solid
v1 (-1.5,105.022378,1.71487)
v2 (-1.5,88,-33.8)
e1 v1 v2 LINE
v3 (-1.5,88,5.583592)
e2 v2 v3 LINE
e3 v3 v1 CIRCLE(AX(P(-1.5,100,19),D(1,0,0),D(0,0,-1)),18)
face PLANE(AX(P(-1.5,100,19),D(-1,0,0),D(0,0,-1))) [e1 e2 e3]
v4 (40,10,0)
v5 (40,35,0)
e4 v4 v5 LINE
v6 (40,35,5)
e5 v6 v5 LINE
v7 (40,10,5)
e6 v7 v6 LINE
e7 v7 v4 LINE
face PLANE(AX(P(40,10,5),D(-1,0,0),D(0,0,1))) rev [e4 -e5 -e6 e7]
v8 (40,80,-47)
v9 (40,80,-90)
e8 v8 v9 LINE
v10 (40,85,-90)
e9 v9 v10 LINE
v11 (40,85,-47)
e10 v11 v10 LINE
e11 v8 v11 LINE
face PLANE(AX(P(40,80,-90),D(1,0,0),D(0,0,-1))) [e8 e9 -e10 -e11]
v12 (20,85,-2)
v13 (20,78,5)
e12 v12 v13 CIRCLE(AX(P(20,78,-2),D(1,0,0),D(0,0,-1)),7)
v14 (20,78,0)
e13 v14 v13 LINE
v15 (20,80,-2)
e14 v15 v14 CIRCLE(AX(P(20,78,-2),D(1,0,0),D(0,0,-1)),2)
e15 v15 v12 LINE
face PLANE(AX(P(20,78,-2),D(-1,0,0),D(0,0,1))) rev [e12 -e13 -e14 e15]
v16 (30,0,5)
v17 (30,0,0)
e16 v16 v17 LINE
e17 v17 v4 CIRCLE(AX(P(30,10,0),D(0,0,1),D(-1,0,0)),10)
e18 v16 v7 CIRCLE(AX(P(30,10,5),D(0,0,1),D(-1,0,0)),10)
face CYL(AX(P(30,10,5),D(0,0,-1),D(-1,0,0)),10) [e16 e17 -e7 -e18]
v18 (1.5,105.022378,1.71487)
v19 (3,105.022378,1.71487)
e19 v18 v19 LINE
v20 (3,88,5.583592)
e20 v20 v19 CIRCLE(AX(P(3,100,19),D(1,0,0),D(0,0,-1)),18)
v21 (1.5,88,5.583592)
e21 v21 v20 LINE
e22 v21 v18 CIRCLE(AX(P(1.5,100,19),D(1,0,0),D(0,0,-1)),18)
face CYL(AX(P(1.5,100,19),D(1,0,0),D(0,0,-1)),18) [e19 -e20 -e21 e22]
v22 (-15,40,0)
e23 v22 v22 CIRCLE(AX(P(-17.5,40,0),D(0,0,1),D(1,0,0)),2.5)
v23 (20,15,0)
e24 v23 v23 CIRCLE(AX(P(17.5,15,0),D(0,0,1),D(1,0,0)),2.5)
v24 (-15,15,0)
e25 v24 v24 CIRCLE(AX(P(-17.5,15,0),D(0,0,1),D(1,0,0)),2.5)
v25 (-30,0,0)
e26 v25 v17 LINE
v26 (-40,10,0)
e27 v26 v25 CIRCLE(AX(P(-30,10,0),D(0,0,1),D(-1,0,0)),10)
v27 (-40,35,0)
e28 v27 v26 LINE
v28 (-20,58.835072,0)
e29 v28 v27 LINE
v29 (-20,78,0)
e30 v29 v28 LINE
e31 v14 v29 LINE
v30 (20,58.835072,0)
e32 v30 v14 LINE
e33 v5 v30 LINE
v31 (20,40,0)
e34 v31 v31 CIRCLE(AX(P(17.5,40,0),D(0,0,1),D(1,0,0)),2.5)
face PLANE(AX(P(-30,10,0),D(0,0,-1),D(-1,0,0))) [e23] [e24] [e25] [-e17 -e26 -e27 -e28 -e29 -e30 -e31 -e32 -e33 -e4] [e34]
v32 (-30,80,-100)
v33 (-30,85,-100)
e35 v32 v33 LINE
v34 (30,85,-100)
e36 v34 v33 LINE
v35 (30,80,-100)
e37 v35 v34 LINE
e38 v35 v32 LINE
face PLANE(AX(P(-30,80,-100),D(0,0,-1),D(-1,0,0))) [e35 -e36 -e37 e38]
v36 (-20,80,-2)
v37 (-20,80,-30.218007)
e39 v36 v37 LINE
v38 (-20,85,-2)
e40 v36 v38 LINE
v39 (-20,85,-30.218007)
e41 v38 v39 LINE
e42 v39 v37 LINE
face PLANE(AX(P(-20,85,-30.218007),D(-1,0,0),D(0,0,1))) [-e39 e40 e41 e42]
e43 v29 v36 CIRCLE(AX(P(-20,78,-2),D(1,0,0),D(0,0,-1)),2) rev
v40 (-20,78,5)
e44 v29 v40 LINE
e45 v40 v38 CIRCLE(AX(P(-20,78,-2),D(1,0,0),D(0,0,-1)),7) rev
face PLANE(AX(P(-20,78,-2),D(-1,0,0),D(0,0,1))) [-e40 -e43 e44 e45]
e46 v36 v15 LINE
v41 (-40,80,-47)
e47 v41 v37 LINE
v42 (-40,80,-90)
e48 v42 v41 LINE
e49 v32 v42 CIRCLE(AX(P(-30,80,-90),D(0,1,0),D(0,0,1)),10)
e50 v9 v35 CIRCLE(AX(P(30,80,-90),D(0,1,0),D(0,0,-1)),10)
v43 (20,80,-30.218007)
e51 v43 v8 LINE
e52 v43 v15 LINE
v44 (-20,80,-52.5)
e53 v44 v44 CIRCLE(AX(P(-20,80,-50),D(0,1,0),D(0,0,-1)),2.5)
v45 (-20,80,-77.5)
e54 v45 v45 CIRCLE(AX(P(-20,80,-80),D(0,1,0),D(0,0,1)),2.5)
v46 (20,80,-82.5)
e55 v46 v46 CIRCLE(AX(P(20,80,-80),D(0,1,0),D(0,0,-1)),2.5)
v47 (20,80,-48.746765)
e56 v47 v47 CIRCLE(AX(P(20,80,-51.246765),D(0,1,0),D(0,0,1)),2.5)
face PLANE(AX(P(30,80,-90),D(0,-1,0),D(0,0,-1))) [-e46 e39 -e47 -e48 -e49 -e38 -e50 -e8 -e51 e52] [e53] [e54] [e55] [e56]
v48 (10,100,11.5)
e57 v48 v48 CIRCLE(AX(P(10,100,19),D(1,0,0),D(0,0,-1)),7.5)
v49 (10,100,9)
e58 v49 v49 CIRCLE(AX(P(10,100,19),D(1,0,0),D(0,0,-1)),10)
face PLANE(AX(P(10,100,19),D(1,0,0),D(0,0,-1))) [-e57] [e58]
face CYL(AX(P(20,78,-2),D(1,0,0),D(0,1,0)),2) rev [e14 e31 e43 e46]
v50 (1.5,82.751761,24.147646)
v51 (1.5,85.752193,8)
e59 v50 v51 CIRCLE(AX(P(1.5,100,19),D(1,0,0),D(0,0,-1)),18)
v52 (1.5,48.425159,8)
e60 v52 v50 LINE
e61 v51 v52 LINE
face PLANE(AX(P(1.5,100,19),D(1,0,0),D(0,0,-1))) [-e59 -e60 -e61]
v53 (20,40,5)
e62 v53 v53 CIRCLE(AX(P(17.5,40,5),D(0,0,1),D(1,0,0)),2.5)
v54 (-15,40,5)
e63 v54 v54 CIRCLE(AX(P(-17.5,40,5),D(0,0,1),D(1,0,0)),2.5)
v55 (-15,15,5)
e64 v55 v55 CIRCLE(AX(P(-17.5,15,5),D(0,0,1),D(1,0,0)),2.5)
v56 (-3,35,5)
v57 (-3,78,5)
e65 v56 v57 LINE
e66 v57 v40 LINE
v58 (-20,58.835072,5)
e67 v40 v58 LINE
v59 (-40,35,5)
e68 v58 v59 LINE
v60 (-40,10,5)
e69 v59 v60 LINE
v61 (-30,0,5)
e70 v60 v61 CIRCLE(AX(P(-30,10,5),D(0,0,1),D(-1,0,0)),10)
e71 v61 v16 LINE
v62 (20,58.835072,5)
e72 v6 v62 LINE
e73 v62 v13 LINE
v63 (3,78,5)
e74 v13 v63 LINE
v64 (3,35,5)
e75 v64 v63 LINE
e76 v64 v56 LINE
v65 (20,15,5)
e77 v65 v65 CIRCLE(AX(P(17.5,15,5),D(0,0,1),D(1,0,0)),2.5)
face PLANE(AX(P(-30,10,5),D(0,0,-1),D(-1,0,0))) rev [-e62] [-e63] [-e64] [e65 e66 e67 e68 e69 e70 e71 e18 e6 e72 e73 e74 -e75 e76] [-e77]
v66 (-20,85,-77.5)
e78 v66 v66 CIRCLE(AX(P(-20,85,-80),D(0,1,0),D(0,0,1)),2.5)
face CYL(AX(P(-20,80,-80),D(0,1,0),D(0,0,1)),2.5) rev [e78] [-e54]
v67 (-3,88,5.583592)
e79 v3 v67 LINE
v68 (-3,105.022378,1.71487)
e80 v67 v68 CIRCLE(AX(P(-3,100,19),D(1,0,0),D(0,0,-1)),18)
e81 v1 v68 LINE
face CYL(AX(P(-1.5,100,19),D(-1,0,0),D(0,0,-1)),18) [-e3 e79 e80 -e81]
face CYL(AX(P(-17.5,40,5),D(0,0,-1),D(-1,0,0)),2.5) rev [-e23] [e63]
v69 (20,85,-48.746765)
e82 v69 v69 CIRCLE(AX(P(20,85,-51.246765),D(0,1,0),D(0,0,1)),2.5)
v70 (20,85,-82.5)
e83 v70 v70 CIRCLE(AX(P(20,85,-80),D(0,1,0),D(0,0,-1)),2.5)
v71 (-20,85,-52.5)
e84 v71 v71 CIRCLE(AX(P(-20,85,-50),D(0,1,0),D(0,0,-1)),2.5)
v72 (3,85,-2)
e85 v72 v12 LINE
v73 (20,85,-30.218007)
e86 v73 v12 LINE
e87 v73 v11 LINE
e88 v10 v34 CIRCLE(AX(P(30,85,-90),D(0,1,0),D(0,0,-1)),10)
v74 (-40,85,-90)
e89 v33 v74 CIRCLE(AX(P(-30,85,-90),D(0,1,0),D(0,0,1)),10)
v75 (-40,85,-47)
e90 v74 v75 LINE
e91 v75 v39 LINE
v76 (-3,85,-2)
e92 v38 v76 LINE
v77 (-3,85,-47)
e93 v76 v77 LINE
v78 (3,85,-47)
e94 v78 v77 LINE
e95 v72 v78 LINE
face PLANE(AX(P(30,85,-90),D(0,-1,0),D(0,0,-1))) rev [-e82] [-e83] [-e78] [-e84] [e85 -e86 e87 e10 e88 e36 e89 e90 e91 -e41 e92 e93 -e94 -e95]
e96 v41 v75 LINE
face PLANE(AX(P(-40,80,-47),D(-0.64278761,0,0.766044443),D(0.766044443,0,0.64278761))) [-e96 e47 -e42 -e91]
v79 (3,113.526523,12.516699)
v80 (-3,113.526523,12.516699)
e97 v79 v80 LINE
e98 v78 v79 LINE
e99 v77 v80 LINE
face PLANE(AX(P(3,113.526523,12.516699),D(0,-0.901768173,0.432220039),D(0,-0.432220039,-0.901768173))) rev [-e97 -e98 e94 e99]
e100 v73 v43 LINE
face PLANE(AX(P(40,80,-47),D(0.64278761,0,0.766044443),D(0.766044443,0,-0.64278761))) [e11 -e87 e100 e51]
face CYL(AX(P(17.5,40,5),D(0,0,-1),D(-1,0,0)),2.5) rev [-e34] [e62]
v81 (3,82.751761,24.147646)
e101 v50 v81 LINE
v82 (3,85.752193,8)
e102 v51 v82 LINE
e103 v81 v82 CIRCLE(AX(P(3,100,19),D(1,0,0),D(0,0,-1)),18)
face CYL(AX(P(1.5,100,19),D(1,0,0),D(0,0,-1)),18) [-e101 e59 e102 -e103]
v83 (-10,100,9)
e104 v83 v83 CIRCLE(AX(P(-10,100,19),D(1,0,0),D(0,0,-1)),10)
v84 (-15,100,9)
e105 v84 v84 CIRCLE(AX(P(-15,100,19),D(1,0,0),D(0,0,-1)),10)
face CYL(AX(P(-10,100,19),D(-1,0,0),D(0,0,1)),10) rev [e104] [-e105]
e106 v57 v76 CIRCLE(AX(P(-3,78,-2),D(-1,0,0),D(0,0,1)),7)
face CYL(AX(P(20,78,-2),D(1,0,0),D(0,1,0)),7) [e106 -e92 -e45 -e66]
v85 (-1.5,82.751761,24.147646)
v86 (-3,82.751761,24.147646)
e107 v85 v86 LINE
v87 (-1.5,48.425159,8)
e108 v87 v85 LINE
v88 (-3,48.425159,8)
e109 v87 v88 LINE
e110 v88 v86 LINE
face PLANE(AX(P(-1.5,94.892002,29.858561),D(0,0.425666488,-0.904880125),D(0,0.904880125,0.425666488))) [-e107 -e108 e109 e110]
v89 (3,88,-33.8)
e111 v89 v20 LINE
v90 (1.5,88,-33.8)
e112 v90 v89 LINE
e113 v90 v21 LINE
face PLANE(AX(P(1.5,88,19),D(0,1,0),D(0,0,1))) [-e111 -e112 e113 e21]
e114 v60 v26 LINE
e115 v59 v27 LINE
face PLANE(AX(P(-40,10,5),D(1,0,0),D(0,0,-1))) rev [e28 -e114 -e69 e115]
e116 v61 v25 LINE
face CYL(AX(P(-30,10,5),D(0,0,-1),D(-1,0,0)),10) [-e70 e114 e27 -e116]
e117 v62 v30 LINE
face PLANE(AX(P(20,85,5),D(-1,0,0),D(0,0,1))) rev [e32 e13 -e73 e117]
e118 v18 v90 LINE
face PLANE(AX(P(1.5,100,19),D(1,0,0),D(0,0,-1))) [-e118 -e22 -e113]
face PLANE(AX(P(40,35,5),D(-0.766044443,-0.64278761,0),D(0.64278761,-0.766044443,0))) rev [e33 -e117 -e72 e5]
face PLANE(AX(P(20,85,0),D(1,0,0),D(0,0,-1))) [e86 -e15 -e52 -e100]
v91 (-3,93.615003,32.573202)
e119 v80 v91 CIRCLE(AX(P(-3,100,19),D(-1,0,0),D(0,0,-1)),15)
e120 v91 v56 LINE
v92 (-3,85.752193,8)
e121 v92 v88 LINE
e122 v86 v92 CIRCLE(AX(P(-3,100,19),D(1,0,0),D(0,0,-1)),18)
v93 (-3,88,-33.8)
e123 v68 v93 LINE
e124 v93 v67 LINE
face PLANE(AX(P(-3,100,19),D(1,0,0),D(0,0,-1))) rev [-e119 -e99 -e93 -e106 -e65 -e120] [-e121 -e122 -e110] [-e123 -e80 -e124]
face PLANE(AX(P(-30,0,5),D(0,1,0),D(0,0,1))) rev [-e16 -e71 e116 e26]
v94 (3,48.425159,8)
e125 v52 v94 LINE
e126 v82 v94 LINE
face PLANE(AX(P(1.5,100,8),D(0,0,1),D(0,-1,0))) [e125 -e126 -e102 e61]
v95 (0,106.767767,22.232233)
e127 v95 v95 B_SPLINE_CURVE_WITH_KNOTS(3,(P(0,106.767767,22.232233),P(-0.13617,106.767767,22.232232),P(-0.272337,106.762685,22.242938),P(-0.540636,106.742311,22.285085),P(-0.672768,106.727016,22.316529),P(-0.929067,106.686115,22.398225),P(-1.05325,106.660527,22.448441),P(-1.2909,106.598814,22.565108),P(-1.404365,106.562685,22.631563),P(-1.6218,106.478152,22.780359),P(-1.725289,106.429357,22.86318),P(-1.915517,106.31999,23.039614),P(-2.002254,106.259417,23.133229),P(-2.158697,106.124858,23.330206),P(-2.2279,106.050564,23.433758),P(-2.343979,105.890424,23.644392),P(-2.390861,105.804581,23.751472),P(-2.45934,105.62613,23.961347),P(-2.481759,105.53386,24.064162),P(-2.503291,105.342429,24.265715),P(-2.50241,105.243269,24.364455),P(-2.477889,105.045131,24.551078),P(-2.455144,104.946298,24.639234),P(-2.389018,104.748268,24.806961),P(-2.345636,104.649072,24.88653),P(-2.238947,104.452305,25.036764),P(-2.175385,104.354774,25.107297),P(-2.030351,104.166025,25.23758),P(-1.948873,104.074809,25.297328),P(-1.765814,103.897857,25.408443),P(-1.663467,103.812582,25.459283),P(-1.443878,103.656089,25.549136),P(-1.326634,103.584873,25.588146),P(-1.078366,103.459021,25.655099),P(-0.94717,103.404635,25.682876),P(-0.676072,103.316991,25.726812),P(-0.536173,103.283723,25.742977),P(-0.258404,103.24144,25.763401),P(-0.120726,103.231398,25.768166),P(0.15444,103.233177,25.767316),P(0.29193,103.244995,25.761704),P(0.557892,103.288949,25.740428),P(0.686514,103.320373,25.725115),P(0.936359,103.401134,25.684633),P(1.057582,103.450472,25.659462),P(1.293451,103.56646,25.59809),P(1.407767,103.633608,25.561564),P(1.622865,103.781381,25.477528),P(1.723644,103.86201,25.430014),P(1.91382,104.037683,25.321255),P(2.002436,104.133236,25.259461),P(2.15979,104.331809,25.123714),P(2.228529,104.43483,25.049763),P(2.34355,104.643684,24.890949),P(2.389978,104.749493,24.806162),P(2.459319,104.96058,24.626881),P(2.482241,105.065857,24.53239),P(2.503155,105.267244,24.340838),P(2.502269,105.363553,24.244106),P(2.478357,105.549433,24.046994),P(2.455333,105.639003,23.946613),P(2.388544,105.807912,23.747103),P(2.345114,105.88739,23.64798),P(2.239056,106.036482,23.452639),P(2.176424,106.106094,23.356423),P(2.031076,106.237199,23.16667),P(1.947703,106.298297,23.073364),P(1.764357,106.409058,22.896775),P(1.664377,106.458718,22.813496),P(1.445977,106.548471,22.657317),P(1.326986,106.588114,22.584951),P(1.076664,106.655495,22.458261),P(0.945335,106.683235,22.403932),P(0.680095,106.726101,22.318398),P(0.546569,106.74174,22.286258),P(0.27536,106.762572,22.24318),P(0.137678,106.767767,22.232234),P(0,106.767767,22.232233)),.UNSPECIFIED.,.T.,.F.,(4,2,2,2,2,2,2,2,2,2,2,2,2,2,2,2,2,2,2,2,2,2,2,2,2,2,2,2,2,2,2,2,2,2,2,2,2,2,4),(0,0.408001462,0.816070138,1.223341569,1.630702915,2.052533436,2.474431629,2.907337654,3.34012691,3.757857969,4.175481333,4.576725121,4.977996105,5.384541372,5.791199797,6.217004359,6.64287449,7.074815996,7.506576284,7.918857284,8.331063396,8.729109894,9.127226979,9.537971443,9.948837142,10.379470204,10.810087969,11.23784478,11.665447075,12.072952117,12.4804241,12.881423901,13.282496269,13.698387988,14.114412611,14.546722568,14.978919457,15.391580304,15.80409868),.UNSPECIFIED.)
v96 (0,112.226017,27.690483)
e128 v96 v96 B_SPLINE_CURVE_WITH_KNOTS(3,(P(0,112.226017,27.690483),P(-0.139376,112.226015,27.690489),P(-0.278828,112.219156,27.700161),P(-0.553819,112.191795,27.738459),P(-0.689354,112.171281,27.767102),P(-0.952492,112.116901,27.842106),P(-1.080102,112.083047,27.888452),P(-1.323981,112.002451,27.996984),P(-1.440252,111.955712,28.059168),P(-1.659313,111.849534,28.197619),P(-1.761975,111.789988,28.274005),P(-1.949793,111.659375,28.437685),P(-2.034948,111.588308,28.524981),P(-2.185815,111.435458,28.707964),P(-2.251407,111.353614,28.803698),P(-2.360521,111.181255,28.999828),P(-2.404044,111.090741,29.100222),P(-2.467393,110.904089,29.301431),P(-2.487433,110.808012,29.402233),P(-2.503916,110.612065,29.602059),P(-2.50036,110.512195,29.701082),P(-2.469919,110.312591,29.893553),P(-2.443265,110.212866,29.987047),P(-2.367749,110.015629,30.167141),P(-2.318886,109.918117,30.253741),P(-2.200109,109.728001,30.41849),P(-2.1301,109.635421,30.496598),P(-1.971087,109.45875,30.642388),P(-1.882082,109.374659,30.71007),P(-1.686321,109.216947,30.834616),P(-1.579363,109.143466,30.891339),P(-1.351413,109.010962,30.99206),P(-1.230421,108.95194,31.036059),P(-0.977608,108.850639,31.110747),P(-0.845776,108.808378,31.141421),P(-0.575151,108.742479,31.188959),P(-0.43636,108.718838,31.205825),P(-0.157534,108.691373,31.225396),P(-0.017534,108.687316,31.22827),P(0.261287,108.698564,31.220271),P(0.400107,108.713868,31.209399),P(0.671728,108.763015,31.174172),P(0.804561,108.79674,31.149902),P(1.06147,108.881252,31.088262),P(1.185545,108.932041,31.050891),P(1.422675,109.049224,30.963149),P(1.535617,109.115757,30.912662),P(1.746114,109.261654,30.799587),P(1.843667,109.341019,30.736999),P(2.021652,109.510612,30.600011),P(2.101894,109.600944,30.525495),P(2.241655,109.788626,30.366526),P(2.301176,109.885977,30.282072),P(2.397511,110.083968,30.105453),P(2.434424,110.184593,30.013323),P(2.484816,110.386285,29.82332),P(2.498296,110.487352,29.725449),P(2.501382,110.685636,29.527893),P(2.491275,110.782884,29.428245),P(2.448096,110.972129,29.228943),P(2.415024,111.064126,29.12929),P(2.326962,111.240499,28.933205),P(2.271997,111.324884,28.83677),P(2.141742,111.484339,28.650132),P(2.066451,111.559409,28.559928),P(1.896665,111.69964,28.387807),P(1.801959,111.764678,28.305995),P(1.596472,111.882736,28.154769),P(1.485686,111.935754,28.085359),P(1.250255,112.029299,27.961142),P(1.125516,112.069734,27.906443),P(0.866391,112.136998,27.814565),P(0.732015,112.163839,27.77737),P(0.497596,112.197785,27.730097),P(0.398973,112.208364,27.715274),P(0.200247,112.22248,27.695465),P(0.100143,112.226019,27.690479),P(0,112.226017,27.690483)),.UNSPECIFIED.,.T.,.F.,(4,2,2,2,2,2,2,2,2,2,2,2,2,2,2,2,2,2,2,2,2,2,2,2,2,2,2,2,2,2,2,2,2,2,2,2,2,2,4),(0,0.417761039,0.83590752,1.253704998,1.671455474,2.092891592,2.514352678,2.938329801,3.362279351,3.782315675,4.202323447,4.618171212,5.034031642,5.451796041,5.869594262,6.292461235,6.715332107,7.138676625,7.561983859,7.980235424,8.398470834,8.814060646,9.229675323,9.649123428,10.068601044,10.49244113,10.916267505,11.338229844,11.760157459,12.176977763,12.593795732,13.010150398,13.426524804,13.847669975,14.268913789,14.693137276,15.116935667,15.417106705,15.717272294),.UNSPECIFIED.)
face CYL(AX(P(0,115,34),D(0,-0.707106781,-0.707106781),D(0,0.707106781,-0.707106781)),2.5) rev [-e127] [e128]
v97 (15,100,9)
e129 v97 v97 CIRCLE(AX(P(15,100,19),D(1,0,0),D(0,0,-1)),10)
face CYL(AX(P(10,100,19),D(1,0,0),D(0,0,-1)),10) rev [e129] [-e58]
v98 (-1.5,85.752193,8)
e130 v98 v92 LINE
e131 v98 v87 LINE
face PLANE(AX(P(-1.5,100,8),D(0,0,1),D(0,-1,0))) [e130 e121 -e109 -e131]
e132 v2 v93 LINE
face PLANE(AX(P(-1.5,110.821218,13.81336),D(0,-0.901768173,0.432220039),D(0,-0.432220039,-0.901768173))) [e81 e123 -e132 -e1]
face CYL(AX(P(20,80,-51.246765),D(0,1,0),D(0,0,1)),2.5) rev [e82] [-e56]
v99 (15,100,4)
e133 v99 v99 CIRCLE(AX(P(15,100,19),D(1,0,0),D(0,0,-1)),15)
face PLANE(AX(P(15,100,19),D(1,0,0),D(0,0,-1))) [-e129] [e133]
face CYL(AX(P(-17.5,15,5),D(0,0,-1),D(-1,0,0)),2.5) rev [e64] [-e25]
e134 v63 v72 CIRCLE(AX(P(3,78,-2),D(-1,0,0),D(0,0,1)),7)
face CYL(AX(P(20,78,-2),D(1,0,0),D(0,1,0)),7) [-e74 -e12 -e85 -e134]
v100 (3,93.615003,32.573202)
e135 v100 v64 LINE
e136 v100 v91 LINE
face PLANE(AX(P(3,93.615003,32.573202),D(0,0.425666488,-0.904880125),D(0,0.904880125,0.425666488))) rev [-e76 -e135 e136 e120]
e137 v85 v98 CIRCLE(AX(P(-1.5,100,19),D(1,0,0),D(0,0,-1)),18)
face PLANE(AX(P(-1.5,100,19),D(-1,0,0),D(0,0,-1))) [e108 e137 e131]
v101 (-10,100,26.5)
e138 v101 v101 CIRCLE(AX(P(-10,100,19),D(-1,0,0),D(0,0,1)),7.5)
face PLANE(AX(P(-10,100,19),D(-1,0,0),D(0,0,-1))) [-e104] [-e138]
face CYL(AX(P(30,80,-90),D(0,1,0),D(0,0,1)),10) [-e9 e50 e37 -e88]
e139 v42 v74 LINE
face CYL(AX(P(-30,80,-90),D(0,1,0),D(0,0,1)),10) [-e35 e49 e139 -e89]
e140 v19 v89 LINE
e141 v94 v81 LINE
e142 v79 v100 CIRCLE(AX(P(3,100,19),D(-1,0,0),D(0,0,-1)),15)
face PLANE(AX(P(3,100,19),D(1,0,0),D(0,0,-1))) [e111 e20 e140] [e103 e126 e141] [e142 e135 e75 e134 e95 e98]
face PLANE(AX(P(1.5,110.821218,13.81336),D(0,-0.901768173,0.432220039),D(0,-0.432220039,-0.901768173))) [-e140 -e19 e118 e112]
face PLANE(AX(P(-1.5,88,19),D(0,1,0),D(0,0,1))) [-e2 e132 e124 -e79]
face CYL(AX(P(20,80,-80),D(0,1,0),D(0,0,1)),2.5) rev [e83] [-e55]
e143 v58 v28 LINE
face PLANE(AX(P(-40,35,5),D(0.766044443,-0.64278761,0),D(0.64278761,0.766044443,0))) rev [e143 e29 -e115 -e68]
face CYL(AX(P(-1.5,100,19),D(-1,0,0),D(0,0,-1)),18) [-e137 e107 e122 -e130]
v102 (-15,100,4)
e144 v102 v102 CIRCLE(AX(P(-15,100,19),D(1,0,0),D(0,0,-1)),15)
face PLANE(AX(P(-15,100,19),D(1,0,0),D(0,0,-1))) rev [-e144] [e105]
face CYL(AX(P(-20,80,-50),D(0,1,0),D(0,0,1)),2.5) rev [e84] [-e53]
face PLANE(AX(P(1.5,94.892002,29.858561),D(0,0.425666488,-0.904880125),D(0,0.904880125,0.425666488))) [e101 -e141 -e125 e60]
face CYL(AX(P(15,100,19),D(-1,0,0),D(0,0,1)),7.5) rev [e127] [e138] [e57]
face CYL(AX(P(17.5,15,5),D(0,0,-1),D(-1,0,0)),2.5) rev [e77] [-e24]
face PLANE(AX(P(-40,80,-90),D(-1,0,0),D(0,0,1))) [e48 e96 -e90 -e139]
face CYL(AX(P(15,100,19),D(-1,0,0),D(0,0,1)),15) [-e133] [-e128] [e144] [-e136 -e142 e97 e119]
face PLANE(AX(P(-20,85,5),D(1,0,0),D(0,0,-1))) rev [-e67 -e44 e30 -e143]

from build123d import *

# Parameters (mm, degrees)
SKETCH1_R                    = 2.5
BASE_FLANGE1_DEPTH           = 5
SKETCH6_R                    = 2.5
BASE_FLANGE2_DEPTH           = 5
EDGE_FLANGE1_STRIP_W         = 24
EDGE_FLANGE1_STRIP_H         = 5
EDGE_FLANGE1_STRIP_CUT_DEPTH = 40
EDGE_FLANGE1_DEPTH           = 40
SKETCH19_R                   = 15
SKETCH19_R_2                 = 7.5
BOSS_EXTRUDE1_DEPTH          = 15
SKETCH20_R                   = 10
CUT_EXTRUDE1_DEPTH           = 5
BOSS_EXTRUDE2_DEPTH          = 3
CUT_EXTRUDE3_START           = 1.5
CUT_EXTRUDE3_DEPTH           = 1.5
CUT_EXTRUDE4_START           = 20
SKETCH23_R                   = 2.5
CUT_EXTRUDE4_DEPTH           = 126.187158898


# Sheet-metal steps are written as plain solids
with BuildPart() as part:
    # Sketch1 → Base-Flange1 (new body)
    with BuildSketch(Plane.XY):
        with BuildLine():
            Line((-30, 0), (30, 0))
            ThreePointArc((30, 0), (37.071067812, 2.928932188), (40, 10))
            Line((40, 10), (40, 35))
            Line((40, 35), (20, 58.835071852))
            Line((20, 58.835071852), (20, 85))
            Line((20, 85), (-20, 85))
            Line((-20, 85), (-20, 58.835071852))
            Line((-20, 58.835071852), (-40, 35))
            Line((-40, 35), (-40, 10))
            ThreePointArc((-40, 10), (-37.071067812, 2.928932188), (-30, 0))
        make_face()
        with Locations((17.5, 15)):
            Circle(SKETCH1_R, mode=Mode.SUBTRACT)
        with Locations((-17.5, 15)):
            Circle(SKETCH1_R, mode=Mode.SUBTRACT)
        with Locations((-17.5, 40)):
            Circle(SKETCH1_R, mode=Mode.SUBTRACT)
        with Locations((17.5, 40)):
            Circle(SKETCH1_R, mode=Mode.SUBTRACT)
    extrude(amount=BASE_FLANGE1_DEPTH)

    # Edge-Flange1 strip (across the edge) → Edge-Flange1 strip cut (cut)
    with BuildSketch(Plane(origin=(-20, 85, 0), x_dir=(0, -1, 0), z_dir=(1, 0, 0))):
        with Locations((-5, -2.5)):
            Rectangle(EDGE_FLANGE1_STRIP_W, EDGE_FLANGE1_STRIP_H)
    extrude(amount=EDGE_FLANGE1_STRIP_CUT_DEPTH, mode=Mode.SUBTRACT)

    # Edge-Flange1 section (across the edge) → Edge-Flange1 (add)
    with BuildSketch(Plane(origin=(-20, 85, 0), x_dir=(0, -1, 0), z_dir=(1, 0, 0))):
        with BuildLine():
            Line((0, 2), (0, 30.218007376))
            Line((0, 30.218007376), (5, 30.218007376))
            Line((5, 30.218007376), (5, 2))
            ThreePointArc((5, 2), (5.585786438, 0.585786438), (7, 0))
            Line((7, 0), (7, -5))
            ThreePointArc((7, -5), (2.050252532, -2.949747468), (0, 2))
        make_face()
    extrude(amount=EDGE_FLANGE1_DEPTH)


with BuildPart() as body_2:
    # Sketch6 → Base-Flange2 (new body)
    with BuildSketch(Plane(origin=(0, 85, 0), x_dir=(1, 0, 0), z_dir=(0, 1, 0))):
        with BuildLine():
            Line((-30, 100), (30, 100))
            ThreePointArc((30, 100), (37.071067812, 97.071067812), (40, 90))
            Line((40, 90), (40, 47))
            Line((40, 47), (20, 30.218007376))
            Line((20, 30.218007376), (-20, 30.218007376))
            Line((-20, 30.218007376), (-40, 47))
            Line((-40, 47), (-40, 90))
            ThreePointArc((-40, 90), (-37.071067812, 97.071067812), (-30, 100))
        make_face()
        with Locations(Location((-20, 80, 0), (0, 0, 270))):
            Circle(SKETCH6_R, mode=Mode.SUBTRACT)
        with Locations(Location((20, 80, 0), (0, 0, 90))):
            Circle(SKETCH6_R, mode=Mode.SUBTRACT)
        with Locations(Location((20, 51.246765298, 0), (0, 0, 270))):
            Circle(SKETCH6_R, mode=Mode.SUBTRACT)
        with Locations(Location((-20, 50, 0), (0, 0, 90))):
            Circle(SKETCH6_R, mode=Mode.SUBTRACT)
    extrude(amount=-BASE_FLANGE2_DEPTH)

    # Combine2: union part
    add(part.part)



with BuildPart() as body_2_2:
    # Sketch19 → Boss-Extrude1 (new, symmetric)
    with BuildSketch(Plane(origin=(0, 0, 0), x_dir=(0, 0, -1), z_dir=(1, 0, 0))):
        with Locations((-19, 100)):
            Circle(SKETCH19_R)
        with Locations((-19, 100)):
            Circle(SKETCH19_R_2, mode=Mode.SUBTRACT)
    extrude(amount=BOSS_EXTRUDE1_DEPTH, both=True)

    # Sketch20 → Cut-Extrude1 (cut)
    with BuildSketch(Plane(origin=(15, 0, 0), x_dir=(0, 0, -1), z_dir=(1, 0, 0))):
        with Locations((-19, 100)):
            Circle(SKETCH20_R)
    cut_extrude1 = extrude(amount=-CUT_EXTRUDE1_DEPTH, mode=Mode.SUBTRACT)

    # Mirror1: Cut-Extrude1 across plane
    add(cut_extrude1.mirror(Plane(origin=(0, 0, 0), x_dir=(0, 0, 1), z_dir=(1, 0, 0))), mode=Mode.SUBTRACT)


with BuildPart() as body_2_1:
    add(body_2.part)

    add(body_2_2.part)  # Boss-Extrude2 merges body 2 2
    # Sketch21 → Boss-Extrude2 (add, symmetric)
    with BuildSketch(Plane(origin=(0, 0, 0), x_dir=(0, 0, -1), z_dir=(1, 0, 0))):
        with BuildLine():
            Line((-32.573201875, 93.615002673), (-5, 35))
            Line((-5, 35), (-5, 78))
            ThreePointArc((-5, 78), (-2.949747468, 82.949747468), (2, 85))
            Line((2, 85), (47, 85))
            Line((47, 85), (-12.516699411, 113.526522593))
            ThreePointArc((-12.516699411, 113.526522593), (-8.431942873, 89.354993257), (-32.573201875, 93.615002673))
        make_face()
    extrude(amount=BOSS_EXTRUDE2_DEPTH, both=True)

    # Sketch22 → Cut-Extrude3 (cut)
    with BuildSketch(Plane(origin=(0, 0, 0), x_dir=(0, 0, -1), z_dir=(1, 0, 0)).offset(CUT_EXTRUDE3_START)):
        with BuildLine():
            Line((-24.147646276, 82.751761313), (-8, 48.425159203))
            Line((-8, 48.425159203), (-8, 85.752193151))
            ThreePointArc((-8, 85.752193151), (-15.711663212, 82.302914331), (-24.147646276, 82.751761313))
        make_face()
        with BuildLine():
            Line((33.8, 88), (-1.714869921, 105.02237774))
            ThreePointArc((-1.714869921, 105.02237774), (-1.447608596, 96.010820135), (-5.583592135, 88))
            Line((-5.583592135, 88), (33.8, 88))
        make_face()
    cut_extrude3 = extrude(amount=CUT_EXTRUDE3_DEPTH, mode=Mode.SUBTRACT)

    # Mirror4: Cut-Extrude3 across plane
    add(cut_extrude3.mirror(Plane(origin=(0, 0, 0), x_dir=(0, 0, 1), z_dir=(1, 0, 0))), mode=Mode.SUBTRACT)

    # Sketch23 → Cut-Extrude4 (cut, through all)
    with BuildSketch(Plane(origin=(20, 82.949747468, 2.949747468), x_dir=(1, 0, 0), z_dir=(0, 0.7071067811865468, 0.7071067811865483)).offset(CUT_EXTRUDE4_START)):
        with Locations(Location((-20, 0.707106781, 0), (0, 0, 90))):
            Circle(SKETCH23_R)
    extrude(amount=CUT_EXTRUDE4_DEPTH, mode=Mode.SUBTRACT)


solid = body_2_1.part
